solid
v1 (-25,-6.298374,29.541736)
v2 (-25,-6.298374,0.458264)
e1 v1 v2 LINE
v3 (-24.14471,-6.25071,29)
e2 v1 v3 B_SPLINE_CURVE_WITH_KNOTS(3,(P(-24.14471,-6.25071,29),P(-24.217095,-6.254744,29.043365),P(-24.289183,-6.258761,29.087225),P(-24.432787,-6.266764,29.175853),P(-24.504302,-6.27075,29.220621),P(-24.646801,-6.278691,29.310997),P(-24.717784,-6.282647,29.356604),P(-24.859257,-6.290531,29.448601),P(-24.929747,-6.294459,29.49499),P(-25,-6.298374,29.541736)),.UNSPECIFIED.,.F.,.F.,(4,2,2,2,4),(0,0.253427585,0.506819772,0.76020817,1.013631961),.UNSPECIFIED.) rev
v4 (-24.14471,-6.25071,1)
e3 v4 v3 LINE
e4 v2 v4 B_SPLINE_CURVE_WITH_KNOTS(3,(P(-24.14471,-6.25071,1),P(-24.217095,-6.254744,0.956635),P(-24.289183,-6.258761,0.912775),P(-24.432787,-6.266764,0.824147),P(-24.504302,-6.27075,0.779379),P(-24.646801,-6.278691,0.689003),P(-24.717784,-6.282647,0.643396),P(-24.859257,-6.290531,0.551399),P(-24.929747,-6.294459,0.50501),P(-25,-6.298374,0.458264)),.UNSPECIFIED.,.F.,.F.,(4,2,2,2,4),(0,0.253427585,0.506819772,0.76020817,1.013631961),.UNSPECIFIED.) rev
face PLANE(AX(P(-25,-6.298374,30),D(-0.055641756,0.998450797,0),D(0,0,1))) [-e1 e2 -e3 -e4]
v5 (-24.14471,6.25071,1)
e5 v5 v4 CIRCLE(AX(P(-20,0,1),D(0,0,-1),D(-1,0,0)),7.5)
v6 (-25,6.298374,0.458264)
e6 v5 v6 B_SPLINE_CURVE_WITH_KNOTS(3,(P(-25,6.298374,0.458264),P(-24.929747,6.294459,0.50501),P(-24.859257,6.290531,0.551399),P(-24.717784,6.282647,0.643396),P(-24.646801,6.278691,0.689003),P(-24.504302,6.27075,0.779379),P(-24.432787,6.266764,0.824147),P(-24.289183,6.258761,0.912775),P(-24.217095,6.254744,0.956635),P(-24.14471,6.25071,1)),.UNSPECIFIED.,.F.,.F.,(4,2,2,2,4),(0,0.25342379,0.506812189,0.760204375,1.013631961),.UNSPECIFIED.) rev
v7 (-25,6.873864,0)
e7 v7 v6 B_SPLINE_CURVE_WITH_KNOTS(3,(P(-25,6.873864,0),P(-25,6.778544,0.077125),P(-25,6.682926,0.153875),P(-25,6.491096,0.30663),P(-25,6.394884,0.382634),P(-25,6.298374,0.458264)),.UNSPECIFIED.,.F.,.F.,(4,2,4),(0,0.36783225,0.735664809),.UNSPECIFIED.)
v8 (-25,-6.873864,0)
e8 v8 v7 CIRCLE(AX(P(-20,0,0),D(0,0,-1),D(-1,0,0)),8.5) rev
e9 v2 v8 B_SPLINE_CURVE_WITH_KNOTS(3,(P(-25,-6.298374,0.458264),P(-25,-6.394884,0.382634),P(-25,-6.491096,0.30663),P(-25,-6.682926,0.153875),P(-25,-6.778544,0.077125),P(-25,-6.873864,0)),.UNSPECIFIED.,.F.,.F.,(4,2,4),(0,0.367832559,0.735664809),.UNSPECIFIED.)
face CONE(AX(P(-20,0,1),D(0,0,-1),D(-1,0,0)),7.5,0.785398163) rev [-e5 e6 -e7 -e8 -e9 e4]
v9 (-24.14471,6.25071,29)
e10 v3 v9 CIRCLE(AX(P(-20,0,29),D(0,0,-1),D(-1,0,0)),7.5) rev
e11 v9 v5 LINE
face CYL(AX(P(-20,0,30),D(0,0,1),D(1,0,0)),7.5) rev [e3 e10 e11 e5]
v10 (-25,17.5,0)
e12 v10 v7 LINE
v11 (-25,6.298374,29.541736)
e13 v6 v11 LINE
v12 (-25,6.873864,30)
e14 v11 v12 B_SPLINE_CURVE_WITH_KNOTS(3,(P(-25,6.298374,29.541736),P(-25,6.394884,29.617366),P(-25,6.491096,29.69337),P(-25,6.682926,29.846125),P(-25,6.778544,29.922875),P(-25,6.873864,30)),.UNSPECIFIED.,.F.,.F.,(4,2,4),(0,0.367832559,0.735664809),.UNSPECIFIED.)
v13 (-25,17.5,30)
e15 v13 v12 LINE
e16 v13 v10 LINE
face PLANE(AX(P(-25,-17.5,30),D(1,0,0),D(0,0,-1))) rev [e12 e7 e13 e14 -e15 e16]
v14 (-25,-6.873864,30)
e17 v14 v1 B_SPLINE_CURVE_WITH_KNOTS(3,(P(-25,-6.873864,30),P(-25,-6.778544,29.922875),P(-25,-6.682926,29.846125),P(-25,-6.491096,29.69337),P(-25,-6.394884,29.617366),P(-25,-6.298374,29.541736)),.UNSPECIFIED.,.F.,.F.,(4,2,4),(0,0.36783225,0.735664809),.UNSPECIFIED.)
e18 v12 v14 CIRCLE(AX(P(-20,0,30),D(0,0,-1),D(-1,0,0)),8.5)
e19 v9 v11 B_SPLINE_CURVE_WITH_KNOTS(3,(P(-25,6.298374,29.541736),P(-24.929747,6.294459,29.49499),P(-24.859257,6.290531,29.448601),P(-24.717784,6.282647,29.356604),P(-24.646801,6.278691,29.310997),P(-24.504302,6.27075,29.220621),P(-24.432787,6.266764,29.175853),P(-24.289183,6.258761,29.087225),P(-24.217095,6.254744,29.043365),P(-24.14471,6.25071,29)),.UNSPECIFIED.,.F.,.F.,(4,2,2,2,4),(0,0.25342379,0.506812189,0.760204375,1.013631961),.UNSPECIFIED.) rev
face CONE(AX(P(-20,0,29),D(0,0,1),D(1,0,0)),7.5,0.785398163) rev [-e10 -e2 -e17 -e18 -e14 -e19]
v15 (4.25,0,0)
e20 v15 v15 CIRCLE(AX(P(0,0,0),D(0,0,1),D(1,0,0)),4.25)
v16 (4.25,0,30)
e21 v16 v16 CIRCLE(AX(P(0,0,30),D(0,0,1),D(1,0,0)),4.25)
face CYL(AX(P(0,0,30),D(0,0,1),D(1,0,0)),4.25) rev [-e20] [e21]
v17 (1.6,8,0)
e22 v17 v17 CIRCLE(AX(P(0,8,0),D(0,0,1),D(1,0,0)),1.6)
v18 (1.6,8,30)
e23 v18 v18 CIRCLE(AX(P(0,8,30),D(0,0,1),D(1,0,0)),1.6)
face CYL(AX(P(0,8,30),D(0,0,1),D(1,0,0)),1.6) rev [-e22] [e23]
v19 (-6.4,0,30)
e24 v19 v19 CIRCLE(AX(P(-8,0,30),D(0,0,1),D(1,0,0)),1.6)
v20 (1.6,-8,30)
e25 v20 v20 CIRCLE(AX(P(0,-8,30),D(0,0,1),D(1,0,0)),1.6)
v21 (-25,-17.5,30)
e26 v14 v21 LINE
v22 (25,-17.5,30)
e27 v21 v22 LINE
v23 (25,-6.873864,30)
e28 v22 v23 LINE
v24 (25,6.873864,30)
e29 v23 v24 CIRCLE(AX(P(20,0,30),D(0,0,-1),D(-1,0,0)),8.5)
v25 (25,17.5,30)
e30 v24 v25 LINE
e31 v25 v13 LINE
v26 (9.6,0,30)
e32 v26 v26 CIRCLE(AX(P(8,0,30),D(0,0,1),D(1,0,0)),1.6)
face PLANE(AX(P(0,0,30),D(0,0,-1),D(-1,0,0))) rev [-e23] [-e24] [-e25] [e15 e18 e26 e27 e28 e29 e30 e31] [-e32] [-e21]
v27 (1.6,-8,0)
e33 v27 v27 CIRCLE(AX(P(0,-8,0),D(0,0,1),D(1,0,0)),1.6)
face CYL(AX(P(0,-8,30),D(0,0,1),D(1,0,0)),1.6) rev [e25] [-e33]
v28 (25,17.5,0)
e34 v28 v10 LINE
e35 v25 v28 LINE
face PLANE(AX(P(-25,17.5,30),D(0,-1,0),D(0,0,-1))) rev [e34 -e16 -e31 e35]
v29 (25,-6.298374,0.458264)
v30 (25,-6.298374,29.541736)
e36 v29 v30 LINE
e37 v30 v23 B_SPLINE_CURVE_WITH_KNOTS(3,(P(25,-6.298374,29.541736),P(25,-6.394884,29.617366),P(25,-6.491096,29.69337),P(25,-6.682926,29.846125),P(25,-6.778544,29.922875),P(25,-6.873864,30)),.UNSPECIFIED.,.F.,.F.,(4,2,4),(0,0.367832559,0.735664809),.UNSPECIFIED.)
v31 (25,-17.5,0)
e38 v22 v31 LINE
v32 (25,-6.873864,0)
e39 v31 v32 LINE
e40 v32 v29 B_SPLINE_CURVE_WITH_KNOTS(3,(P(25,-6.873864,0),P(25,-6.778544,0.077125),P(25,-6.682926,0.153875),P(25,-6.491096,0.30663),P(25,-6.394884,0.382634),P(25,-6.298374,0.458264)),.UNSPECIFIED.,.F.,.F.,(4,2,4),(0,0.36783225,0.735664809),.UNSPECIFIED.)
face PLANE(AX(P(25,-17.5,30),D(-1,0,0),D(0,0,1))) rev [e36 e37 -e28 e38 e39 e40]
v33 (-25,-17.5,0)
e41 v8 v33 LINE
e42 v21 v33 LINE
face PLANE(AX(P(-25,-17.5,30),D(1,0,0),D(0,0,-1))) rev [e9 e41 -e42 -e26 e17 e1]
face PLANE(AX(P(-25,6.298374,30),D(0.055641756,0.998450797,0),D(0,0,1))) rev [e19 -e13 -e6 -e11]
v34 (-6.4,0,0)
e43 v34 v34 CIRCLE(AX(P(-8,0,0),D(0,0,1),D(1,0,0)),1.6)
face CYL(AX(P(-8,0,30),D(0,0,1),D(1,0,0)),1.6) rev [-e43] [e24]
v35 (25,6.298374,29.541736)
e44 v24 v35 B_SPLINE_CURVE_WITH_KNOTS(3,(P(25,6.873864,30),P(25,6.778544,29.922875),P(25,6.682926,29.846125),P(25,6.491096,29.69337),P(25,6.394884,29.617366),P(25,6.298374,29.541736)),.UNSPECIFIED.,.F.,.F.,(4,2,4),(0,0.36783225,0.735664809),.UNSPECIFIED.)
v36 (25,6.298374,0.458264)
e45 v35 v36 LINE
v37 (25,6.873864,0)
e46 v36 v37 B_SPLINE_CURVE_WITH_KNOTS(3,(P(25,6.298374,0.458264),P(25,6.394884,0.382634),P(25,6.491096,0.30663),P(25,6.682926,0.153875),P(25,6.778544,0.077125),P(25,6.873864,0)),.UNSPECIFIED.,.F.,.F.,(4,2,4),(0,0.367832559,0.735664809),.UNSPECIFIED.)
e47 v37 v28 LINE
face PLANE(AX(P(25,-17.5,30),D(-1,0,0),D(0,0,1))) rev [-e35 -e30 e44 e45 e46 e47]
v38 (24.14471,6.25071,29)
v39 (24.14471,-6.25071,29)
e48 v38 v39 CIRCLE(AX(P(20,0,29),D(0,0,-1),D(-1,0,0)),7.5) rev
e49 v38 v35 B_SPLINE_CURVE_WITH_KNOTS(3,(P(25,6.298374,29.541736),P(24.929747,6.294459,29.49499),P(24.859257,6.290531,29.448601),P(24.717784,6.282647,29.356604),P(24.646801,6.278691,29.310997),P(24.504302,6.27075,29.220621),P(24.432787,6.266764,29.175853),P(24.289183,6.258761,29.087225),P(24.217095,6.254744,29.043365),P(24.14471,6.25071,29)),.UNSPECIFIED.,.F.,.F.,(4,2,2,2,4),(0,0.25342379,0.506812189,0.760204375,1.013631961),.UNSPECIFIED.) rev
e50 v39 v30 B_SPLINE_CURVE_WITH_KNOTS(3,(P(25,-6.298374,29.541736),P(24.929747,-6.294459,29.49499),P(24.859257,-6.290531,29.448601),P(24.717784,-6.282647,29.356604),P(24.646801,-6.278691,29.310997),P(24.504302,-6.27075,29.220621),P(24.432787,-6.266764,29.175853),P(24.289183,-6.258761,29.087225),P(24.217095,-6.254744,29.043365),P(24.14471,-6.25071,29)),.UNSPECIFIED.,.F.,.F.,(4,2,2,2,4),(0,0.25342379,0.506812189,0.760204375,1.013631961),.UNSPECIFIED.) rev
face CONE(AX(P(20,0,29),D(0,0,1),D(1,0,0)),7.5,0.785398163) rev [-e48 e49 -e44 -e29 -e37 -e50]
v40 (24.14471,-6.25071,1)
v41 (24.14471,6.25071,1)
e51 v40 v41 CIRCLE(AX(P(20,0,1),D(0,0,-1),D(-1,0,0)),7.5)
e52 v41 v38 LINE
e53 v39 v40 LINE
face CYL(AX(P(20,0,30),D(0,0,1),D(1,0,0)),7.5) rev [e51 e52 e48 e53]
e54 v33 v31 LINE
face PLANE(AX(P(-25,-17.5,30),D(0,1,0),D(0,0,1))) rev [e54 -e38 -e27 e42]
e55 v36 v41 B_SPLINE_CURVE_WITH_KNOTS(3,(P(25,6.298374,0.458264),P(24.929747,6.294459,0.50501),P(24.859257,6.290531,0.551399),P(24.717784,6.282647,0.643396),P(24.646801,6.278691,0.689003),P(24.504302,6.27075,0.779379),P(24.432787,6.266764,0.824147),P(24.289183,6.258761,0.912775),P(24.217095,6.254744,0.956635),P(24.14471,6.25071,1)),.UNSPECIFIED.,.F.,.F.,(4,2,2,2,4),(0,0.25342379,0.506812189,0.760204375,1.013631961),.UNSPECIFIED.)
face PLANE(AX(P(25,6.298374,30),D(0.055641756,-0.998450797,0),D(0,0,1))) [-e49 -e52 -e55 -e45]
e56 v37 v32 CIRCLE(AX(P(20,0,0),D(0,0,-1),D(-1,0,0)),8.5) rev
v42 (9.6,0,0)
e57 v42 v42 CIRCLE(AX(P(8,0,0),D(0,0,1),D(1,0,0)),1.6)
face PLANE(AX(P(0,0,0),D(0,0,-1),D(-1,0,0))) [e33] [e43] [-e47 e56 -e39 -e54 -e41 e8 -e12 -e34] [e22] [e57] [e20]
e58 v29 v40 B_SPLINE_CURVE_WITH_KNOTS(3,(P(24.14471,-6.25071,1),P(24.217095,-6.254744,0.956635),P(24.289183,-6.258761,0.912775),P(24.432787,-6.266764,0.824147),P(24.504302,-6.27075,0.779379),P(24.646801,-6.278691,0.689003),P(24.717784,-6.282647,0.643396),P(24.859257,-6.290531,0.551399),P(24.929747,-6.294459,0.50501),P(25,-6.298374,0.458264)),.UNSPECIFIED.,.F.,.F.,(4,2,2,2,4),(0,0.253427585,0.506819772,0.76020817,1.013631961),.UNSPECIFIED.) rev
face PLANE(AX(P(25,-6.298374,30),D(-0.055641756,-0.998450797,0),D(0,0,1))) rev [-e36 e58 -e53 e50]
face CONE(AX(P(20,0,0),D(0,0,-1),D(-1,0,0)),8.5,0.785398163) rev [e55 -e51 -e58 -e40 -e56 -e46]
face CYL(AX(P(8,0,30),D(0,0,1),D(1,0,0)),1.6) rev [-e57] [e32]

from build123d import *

# Parameters (mm, degrees)
SKETCH_1_W        = 50
SKETCH_1_H        = 35
EXTRUDE_1_DEPTH   = 30
HOLE_WIZARD_341_D = 8.5
HOLE_WIZARD_446_D = 3.2
HOLE_WIZARD_600_D = 15
CHAMFER_1_SIZE    = 1
CHAMFER_1_SIZE_2  = 0.708203932


with BuildPart() as part:
    # 草图1 → 凸台-拉伸1 (new body)
    with BuildSketch(Plane.XY):
        Rectangle(SKETCH_1_W, SKETCH_1_H)
    extrude(amount=EXTRUDE_1_DEPTH)

    # Hole Wizard 341 (through all)
    with Locations(Plane.XY.offset(30)):
        with Locations((0, 0)):
            Hole(HOLE_WIZARD_341_D / 2)

    # Hole Wizard 446 (through all)
    with Locations(Plane.XY.offset(30)):
        with Locations((8, 0), (0, 8), (-8, 0), (0, -8)):
            Hole(HOLE_WIZARD_446_D / 2)

    # Hole Wizard 600 (through all)
    with Locations(Plane.XY.offset(30)):
        with Locations((20, 0), (-20, 0)):
            Hole(HOLE_WIZARD_600_D / 2)

    # 倒角1
    # the kernel refuses this chamfer: 1, 0.708203932 mm, written as the material it takes off along each edge
    with BuildSketch(Plane(origin=(-20, 0, 0), x_dir=(-0.8790200859122482, 0.4767847402789059, 0), z_dir=(-0.4767847402789059, -0.8790200859122482, 0))) as chamfer_1_piece_1:
        Polygon((7.5, -CHAMFER_1_SIZE), (7.5 + CHAMFER_1_SIZE, 0), (7.5, 0), align=None)
    revolve(axis=Axis((-20, 0, 0), (0, 0, -1)), revolution_arc=303.048763938, mode=Mode.SUBTRACT)
    with BuildSketch(Plane(origin=(-20, 0, 30), x_dir=(-0.879020085912248, 0.47678474027890627, 0), z_dir=(-0.47678474027890627, -0.879020085912248, 0))) as chamfer_1_piece_2:
        Polygon((7.5 + CHAMFER_1_SIZE, 0), (7.5, CHAMFER_1_SIZE), (7.5, 0), align=None)
    revolve(axis=Axis((-20, 0, 30), (0, 0, -1)), revolution_arc=303.048763938, mode=Mode.SUBTRACT)
    with BuildSketch(Plane(origin=(20, 0, 30), x_dir=(0.879020085912248, -0.4767847402789061, 0), z_dir=(0.4767847402789061, 0.879020085912248, 0))) as chamfer_1_piece_3:
        Polygon((7.5 + CHAMFER_1_SIZE, 0), (7.5, CHAMFER_1_SIZE), (7.5, 0), align=None)
    revolve(axis=Axis((20, 0, 30), (0, 0, -1)), revolution_arc=303.048763938, mode=Mode.SUBTRACT)
    with BuildSketch(Plane(origin=(20, 0, 0), x_dir=(0.8790200859122481, 0.476784740278906, 0), z_dir=(0.476784740278906, -0.8790200859122481, 0))) as chamfer_1_piece_4:
        Polygon((7.5, CHAMFER_1_SIZE), (7.5 + CHAMFER_1_SIZE, 0), (7.5, 0), align=None)
    revolve(axis=Axis((20, 0, 0), (0, 0, 1)), revolution_arc=303.048763938, mode=Mode.SUBTRACT)
    with BuildSketch(Plane(origin=(-25, 5.590169944, 32.778051389), x_dir=(0.7914486393779661, 0.611235675682274, 0), z_dir=(0, 0, -1)), Plane(origin=(25, -5.590169944, 32.778051389), x_dir=(-0.7914486393779661, -0.611235675682274, 0), z_dir=(0, 0, -1))) as chamfer_1_piece_5:
        with BuildLine():
            Line((1.080663788, 0), (CHAMFER_1_SIZE_2 * 0.611235676113, -CHAMFER_1_SIZE_2 * 0.791448639936))
            Line((CHAMFER_1_SIZE_2 * 0.611235676113, -CHAMFER_1_SIZE_2 * 0.791448639936), (0, 0))
            ThreePointArc((0, 0), (0.555522087, -0.019473843), (1.080663788, 0))
        make_face()
    extrude(amount=35.556102778, mode=Mode.SUBTRACT)
    with BuildSketch(Plane(origin=(-25, -5.590169944, 32.778051389), x_dir=(0.7914486393779665, -0.6112356756822735, 0), z_dir=(0, 0, -1))) as chamfer_1_piece_6:
        with BuildLine():
            Line((1.080663788, 0), (CHAMFER_1_SIZE_2 * 0.611235676113, CHAMFER_1_SIZE_2 * 0.791448639936))
            Line((CHAMFER_1_SIZE_2 * 0.611235676113, CHAMFER_1_SIZE_2 * 0.791448639936), (0, 0))
            ThreePointArc((0, 0), (0.555522087, 0.019473843), (1.080663788, 0))
        make_face()
    extrude(amount=35.556102778, mode=Mode.SUBTRACT)
    with BuildSketch(Plane(origin=(25, 5.590169944, 32.778051389), x_dir=(0, 1, 0), z_dir=(0, 0, -1))) as chamfer_1_piece_7:
        with BuildLine():
            Line((CHAMFER_1_SIZE_2, 0), (0.660540261, -0.855289885))
            ThreePointArc((0.660540261, -0.855289885), (0.354967464, -0.427764092), (0, 0))
            Line((0, 0), (CHAMFER_1_SIZE_2, 0))
        make_face()
    extrude(amount=35.556102778, mode=Mode.SUBTRACT)


solid = part.part
